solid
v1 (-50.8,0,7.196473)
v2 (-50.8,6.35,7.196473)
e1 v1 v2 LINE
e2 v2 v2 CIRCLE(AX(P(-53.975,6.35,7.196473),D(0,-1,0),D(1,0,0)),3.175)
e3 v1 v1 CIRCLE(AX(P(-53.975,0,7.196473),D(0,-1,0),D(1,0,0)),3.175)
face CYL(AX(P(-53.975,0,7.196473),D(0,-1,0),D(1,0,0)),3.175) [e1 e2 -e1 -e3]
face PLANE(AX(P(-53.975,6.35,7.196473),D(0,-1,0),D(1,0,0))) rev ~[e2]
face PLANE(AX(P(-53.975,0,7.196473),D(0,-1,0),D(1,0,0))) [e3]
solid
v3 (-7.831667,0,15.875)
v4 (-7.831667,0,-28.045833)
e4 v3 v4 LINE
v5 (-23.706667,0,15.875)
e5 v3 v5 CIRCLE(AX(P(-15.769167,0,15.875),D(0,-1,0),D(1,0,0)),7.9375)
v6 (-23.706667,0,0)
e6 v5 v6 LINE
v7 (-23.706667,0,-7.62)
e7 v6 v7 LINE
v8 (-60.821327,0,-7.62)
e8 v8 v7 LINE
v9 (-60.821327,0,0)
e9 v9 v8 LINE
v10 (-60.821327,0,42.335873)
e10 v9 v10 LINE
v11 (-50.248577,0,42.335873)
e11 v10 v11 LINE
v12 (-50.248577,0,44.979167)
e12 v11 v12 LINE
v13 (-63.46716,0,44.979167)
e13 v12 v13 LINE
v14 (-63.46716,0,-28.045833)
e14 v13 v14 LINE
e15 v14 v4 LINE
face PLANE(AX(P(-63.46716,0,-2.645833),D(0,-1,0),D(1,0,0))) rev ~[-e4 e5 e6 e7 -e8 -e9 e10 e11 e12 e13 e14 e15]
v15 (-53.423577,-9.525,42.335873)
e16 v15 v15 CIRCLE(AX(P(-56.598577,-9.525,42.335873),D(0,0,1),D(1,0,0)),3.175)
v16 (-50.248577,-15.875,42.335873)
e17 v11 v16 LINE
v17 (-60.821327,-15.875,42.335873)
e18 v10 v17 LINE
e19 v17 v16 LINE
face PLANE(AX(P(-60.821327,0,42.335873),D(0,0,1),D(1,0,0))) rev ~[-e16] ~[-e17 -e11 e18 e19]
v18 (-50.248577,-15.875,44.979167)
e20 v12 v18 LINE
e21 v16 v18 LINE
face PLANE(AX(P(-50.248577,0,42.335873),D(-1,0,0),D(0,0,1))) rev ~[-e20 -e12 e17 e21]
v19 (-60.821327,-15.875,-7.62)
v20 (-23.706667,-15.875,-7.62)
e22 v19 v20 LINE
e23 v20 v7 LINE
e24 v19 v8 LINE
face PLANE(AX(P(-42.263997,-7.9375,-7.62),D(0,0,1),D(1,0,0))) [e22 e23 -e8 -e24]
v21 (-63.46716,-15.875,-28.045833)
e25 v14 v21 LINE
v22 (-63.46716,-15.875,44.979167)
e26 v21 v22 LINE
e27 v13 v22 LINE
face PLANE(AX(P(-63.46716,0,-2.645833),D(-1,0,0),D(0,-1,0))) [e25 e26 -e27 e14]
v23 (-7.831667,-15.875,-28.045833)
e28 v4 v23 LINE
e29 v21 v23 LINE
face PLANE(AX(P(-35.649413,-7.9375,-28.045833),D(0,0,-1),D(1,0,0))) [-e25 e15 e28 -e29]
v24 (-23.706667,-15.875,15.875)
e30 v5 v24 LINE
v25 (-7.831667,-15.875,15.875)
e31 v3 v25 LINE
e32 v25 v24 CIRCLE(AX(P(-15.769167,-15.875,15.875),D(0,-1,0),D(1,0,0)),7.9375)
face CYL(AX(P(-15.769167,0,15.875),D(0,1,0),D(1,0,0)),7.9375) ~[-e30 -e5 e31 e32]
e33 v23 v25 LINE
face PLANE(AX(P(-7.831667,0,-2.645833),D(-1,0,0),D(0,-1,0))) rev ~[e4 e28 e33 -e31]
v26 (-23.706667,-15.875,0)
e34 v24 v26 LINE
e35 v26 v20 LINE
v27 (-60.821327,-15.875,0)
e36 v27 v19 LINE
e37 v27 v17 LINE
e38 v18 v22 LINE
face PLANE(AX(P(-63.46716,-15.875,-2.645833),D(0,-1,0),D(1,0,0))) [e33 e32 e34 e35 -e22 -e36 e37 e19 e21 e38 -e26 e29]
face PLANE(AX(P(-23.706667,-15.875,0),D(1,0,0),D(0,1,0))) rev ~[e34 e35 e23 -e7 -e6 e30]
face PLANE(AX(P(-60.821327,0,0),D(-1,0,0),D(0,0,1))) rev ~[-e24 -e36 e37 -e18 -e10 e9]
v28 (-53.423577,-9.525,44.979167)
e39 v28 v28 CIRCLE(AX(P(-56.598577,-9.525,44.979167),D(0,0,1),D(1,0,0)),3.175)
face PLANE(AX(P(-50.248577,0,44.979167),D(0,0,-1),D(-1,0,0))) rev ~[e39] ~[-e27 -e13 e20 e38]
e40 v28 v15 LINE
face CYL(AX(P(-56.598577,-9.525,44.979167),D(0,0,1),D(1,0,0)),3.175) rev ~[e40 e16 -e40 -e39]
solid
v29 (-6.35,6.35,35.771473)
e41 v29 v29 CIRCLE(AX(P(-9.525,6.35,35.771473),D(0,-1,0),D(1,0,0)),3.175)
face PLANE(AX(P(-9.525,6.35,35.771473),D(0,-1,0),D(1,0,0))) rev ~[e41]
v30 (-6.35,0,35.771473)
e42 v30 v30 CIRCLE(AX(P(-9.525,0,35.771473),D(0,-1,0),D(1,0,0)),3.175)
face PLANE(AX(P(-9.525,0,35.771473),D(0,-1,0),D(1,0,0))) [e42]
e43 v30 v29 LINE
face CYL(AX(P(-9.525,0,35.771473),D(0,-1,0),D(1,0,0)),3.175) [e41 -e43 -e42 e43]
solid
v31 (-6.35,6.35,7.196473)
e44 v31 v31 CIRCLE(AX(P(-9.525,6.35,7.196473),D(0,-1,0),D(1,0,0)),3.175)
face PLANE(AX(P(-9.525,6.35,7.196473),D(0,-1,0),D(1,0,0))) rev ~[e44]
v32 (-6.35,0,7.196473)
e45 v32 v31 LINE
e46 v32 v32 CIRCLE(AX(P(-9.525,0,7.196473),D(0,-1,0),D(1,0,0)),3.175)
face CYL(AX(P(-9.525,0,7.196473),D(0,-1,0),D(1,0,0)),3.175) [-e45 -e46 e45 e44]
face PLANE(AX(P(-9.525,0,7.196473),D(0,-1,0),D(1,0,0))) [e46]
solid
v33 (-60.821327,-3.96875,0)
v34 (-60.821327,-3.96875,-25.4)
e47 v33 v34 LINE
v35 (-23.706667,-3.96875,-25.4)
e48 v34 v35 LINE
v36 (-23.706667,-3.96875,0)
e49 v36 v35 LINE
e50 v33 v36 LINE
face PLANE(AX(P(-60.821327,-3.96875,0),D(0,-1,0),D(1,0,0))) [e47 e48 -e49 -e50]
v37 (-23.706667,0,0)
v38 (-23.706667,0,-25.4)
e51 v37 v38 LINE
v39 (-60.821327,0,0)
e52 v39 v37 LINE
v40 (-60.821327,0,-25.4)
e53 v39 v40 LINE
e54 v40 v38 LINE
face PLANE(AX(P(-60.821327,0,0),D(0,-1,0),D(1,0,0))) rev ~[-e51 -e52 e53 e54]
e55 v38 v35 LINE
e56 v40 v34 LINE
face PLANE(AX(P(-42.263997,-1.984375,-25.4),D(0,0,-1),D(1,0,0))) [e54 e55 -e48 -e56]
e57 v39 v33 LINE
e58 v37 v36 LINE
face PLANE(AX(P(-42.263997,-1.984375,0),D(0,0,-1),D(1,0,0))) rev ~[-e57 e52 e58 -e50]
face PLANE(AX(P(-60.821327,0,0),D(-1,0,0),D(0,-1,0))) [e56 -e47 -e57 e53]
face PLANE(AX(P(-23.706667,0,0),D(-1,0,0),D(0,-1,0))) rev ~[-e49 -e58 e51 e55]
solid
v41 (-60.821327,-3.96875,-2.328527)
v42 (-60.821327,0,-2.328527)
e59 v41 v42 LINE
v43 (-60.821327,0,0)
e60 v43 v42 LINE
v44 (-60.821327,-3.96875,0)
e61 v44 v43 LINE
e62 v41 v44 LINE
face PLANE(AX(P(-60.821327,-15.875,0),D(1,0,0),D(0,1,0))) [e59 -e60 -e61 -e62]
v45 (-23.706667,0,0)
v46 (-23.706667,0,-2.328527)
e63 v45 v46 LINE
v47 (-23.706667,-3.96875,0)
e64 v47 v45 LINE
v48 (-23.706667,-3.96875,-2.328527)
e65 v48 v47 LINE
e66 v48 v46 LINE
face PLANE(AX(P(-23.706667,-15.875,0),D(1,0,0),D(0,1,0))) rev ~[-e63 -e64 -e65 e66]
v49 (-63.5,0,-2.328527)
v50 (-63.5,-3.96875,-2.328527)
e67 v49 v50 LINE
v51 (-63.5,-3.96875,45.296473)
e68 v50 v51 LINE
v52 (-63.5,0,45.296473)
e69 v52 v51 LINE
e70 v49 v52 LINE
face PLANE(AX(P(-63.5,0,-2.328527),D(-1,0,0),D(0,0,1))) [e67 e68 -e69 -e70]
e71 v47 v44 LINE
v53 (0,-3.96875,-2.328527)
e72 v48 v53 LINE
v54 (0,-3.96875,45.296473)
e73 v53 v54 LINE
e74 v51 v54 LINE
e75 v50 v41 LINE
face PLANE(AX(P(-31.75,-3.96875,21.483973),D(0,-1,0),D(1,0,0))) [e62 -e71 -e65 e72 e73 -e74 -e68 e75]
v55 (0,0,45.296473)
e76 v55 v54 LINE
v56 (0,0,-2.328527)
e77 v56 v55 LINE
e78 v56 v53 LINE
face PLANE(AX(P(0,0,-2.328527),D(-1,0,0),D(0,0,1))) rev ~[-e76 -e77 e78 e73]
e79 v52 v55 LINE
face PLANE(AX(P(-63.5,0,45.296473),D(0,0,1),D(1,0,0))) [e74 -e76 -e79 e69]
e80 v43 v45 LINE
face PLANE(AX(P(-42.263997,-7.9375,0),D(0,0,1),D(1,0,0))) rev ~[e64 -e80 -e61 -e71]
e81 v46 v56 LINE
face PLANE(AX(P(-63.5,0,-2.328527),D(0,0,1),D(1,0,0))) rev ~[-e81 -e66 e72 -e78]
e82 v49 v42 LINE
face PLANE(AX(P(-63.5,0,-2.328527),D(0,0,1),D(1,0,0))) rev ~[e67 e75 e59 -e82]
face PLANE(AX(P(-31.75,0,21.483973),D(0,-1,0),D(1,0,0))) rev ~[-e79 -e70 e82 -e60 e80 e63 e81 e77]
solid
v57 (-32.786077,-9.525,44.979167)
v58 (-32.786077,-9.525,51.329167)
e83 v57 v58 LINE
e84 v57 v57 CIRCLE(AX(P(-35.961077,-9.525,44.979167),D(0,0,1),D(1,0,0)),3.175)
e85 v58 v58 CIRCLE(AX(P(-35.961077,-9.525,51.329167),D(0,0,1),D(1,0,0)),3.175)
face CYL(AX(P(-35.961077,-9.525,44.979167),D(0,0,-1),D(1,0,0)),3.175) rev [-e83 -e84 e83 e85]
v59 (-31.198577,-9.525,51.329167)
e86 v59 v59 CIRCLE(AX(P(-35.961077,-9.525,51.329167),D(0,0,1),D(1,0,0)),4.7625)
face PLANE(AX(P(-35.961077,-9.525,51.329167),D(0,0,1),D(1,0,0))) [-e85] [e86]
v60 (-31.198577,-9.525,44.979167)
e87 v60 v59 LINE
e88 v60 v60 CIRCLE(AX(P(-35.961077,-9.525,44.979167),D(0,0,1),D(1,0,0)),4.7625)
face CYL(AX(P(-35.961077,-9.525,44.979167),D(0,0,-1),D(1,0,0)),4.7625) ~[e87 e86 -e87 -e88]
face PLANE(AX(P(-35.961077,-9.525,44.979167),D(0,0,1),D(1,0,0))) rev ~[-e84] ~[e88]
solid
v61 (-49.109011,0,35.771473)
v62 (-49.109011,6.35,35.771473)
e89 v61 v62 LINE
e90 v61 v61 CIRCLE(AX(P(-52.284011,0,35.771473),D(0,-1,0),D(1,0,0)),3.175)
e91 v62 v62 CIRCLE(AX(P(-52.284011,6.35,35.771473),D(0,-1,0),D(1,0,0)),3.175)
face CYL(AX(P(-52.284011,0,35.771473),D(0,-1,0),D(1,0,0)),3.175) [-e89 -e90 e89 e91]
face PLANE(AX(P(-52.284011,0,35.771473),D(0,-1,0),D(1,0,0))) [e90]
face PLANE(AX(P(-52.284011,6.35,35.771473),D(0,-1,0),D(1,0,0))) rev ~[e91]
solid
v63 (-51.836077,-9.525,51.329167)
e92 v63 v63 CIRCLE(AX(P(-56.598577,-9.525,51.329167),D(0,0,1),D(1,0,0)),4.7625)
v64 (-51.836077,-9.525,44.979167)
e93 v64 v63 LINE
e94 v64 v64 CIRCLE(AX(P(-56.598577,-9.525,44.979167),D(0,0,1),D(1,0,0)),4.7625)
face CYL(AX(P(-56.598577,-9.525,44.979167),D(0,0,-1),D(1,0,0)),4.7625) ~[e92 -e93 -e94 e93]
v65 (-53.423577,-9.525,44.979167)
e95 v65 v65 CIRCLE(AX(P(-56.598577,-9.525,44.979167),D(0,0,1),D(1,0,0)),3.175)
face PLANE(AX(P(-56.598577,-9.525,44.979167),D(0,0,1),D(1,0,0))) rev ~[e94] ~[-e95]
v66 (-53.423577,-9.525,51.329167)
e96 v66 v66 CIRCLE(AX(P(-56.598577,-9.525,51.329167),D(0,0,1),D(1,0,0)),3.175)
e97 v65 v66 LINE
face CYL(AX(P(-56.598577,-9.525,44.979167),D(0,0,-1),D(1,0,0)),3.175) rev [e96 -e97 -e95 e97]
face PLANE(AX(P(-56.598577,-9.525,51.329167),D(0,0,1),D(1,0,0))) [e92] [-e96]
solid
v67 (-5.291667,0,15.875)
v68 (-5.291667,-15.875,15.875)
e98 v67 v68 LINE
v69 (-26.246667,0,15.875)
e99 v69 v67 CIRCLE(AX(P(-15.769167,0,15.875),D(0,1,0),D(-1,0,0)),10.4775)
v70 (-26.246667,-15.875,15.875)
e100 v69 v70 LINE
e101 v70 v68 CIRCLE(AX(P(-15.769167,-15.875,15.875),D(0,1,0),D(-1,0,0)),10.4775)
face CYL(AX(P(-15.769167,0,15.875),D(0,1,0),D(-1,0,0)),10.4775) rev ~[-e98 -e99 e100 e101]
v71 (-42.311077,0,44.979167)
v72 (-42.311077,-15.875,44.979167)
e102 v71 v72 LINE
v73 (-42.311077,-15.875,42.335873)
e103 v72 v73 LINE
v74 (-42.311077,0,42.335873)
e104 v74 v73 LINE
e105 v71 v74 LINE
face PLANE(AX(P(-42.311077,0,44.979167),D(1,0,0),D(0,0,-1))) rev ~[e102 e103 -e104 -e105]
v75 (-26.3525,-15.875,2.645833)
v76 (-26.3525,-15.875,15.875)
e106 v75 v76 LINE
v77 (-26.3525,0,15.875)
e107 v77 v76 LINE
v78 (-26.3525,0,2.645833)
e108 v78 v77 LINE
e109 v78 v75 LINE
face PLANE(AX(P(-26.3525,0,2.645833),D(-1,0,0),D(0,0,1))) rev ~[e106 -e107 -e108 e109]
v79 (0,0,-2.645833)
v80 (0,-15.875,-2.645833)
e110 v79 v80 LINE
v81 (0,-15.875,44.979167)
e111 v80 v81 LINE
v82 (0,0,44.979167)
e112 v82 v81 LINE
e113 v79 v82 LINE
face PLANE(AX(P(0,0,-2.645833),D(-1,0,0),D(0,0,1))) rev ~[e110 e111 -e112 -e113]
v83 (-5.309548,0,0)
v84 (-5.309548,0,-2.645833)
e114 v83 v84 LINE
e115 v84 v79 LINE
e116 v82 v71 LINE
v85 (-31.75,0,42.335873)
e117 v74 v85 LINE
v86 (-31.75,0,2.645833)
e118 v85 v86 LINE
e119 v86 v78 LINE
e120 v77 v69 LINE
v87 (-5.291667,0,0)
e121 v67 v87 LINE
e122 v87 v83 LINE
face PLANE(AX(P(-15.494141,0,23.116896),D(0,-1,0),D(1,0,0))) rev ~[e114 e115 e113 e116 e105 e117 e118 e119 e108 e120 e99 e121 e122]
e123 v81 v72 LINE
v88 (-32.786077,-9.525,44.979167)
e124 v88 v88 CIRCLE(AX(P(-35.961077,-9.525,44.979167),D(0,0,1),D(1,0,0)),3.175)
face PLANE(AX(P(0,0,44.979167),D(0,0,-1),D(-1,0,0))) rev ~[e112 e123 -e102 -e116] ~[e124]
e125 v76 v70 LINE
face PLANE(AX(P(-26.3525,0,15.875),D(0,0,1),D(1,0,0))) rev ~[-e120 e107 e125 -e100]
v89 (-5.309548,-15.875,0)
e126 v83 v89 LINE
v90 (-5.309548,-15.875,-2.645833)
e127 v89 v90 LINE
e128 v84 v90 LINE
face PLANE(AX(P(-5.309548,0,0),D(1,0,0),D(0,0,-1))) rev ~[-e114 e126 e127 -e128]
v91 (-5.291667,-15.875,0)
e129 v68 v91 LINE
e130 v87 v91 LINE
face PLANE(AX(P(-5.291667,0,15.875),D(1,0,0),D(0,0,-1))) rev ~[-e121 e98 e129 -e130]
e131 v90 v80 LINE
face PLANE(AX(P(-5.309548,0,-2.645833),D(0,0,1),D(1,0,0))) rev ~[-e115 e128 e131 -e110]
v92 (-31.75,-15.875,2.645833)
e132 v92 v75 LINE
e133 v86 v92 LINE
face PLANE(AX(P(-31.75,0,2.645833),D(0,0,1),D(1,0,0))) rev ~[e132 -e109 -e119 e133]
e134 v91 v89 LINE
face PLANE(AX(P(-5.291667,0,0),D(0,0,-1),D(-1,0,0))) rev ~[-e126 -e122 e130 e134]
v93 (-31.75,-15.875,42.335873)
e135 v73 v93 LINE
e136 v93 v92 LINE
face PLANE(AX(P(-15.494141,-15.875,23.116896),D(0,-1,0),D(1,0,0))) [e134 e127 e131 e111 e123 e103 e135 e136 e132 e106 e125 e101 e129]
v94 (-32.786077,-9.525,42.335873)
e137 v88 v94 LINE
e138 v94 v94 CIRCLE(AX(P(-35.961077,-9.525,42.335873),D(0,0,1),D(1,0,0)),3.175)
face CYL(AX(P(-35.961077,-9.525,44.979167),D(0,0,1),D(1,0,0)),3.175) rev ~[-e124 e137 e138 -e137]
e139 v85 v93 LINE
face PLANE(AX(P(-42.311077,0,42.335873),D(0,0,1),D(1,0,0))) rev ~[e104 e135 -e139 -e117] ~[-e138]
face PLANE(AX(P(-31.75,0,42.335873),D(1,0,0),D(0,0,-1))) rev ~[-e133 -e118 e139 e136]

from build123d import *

# Parameters (mm, degrees)
F1_DEPTH  = 15.875
F0_W      = 2.6458333332
F0_H      = 42.3358732487
F2_W      = 63.5
F2_H      = 47.625
F2_R      = 3.175
F3_DEPTH  = 3.96875
F4_DEPTH  = 6.35
F5_R      = 4.7625
F5_R_2    = 3.175
F6_DEPTH  = 6.35
F7_R      = 3.175
F8_DEPTH  = 25.4
F9_W      = 55.6354932006
F9_H      = 15.875
F10_DEPTH = 25.4
F11_W     = 37.1146598675
F11_H     = 15.875
F12_DEPTH = 7.62
F13_W     = 37.1146598675
F13_H     = 3.96875
F14_DEPTH = 25.4


# Not quite as in the source:
# - a feature names something its author has since deleted; it is built from what else it names


with BuildPart() as f1:
    # F0 (on Front) → F1 (new body)
    with BuildSketch(Plane.XZ):
        with BuildLine():
            Line((0, 44.979166582), (-31.75, 44.979166582))
            Line((-31.75, 44.979166582), (-31.75, 42.3358732487))
            Line((-31.75, 42.3358732487), (-31.75, 2.6458333332))
            Line((-31.75, 2.6458333332), (-26.3525, 2.6458333332))
            Line((-26.3525, 2.6458333332), (-26.3525, 15.875))
            Line((-26.3525, 15.875), (-26.2466666667, 15.875))
            ThreePointArc((-26.2466666667, 15.875), (-15.7691666667, 26.3525), (-5.2916666667, 15.875))
            Line((-5.2916666667, 15.875), (-5.2916666667, 0))
            Line((-5.2916666667, 0), (0, 0))
            Line((0, 0), (0, 44.979166582))
        make_face()
        Polygon((0, -2.6458333333), (0, 0), (-5.2916666667, 0), (-5.309548229, 0), (-5.309548229, -2.6458333333), align=None)
        Polygon((-31.75, 42.3358732487), (-31.75, 44.979166582), (-34.3958333316, 44.979166582), (-37.0416664956, 44.979166582), (-42.3110765377, 44.979166582), (-42.3110765377, 42.3358732487), (-37.0416664956, 42.3358732487), (-34.3958333316, 42.3358732487), align=None)
    extrude(amount=F1_DEPTH)


with BuildPart() as f1b:
    # F0 (on Front) → F1, piece 2 (new body)
    with BuildSketch(Plane.XZ):
        with BuildLine():
            Line((-23.7066666667, 0), (-7.8316666667, 0))
            Line((-7.8316666667, 0), (-7.8316666667, 15.875))
            ThreePointArc((-7.8316666667, 15.875), (-15.7691666667, 23.8125), (-23.7066666667, 15.875))
            Line((-23.7066666667, 15.875), (-23.7066666667, 0))
        make_face()
        Polygon((-26.3525, 0), (-31.75, 0), (-60.8213265341, 0), (-63.4671598673, 0), (-63.4671598673, -2.6458333333), (-7.8316666667, -2.6458333333), (-7.8316666667, 0), (-23.7066666667, 0), align=None)
        with Locations((-62.1442432007, 21.1679366243)):
            Rectangle(F0_W, F0_H)
        Polygon((-50.2485765377, 42.3358732487), (-50.2485765377, 44.979166582), (-55.5296598693, 44.979166582), (-58.175493201, 44.979166582), (-63.4671598673, 44.979166582), (-63.4671598673, 42.3358732487), (-60.8213265341, 42.3358732487), (-58.175493201, 42.3358732487), (-55.5296598693, 42.3358732487), align=None)
    extrude(amount=F1_DEPTH)


with BuildPart() as f3:
    # F2 (on Front) → F3 (new body)
    with BuildSketch(Plane.XZ):
        with Locations((-31.75, 21.4839725468)):
            Rectangle(F2_W, F2_H)
        with Locations((-53.975, 7.1964725468)):
            Circle(F2_R, mode=Mode.SUBTRACT)
        with Locations((-9.525, 7.1964725468)):
            Circle(F2_R, mode=Mode.SUBTRACT)
        with Locations((-52.284011212, 35.7714725468)):
            Circle(F2_R, mode=Mode.SUBTRACT)
        with Locations((-9.525, 35.7714725468)):
            Circle(F2_R, mode=Mode.SUBTRACT)
        with Locations((-52.284011212, 35.7714725468)):
            Circle(F2_R)
        with Locations((-53.975, 7.1964725468)):
            Circle(F2_R)
        with Locations((-9.525, 7.1964725468)):
            Circle(F2_R)
        with Locations((-9.525, 35.7714725468)):
            Circle(F2_R)
    extrude(amount=F3_DEPTH)


with BuildPart() as f4:
    # F2 (on Front) → F4 (new body)
    with BuildSketch(Plane.XZ):
        with Locations((-9.525, 35.7714725468)):
            Circle(F2_R)
    extrude(amount=-F4_DEPTH)


with BuildPart() as f4b:
    # F2 (on Front) → F4, piece 2 (new body)
    with BuildSketch(Plane.XZ):
        with Locations((-52.284011212, 35.7714725468)):
            Circle(F2_R)
    extrude(amount=-F4_DEPTH)


with BuildPart() as f4c:
    # F2 (on Front) → F4, piece 3 (new body)
    with BuildSketch(Plane.XZ):
        with Locations((-9.525, 7.1964725468)):
            Circle(F2_R)
    extrude(amount=-F4_DEPTH)


with BuildPart() as f4d:
    # F2 (on Front) → F4, piece 4 (new body)
    with BuildSketch(Plane.XZ):
        with Locations((-53.975, 7.1964725468)):
            Circle(F2_R)
    extrude(amount=-F4_DEPTH)


with BuildPart() as f6:
    # F5 (on face) → F6 (new body)
    with BuildSketch(Plane.XY.offset(44.979166582)):
        with Locations((-56.5985765377, -9.525)):
            Circle(F5_R)
        with Locations((-56.5985765377, -9.525)):
            Circle(F5_R_2, mode=Mode.SUBTRACT)
    extrude(amount=F6_DEPTH)


with BuildPart() as f6b:
    # F5 (on face) → F6, piece 2 (new body)
    with BuildSketch(Plane.XY.offset(44.979166582)):
        with Locations((-35.9610765377, -9.525)):
            Circle(F5_R)
        with Locations((-35.9610765377, -9.525)):
            Circle(F5_R_2, mode=Mode.SUBTRACT)
    extrude(amount=F6_DEPTH)


with BuildPart() as f8_tool:
    # F7 (on face) → F8 (new body)
    with BuildSketch(Plane.XY.offset(44.979166582)):
        with Locations((-35.9610765377, -9.525)):
            Circle(F7_R)
        with Locations((-56.5985765377, -9.525)):
            Circle(F7_R)
    extrude(amount=-F8_DEPTH)


with BuildPart() as f1_1:
    add(f1.part)

    # F8: cut by f8_tool
    add(f8_tool.part, mode=Mode.SUBTRACT)


with BuildPart() as f1b_1:
    add(f1b.part)

    # F8: cut by f8_tool
    add(f8_tool.part, mode=Mode.SUBTRACT)

    # F9 (on face) → F10 (join)
    with BuildSketch(Plane(origin=(0, 0, -2.6458333333), x_dir=(1, 0, 0), z_dir=(0, 0, -1))):
        with Locations((-35.649413267, 7.9375)):
            Rectangle(F9_W, F9_H)
    extrude(amount=F10_DEPTH)


with BuildPart() as f12_tool:
    # F11 (on face) → F12 (new body)
    with BuildSketch(Plane.XY):
        with Locations((-42.2639966004, -7.9375)):
            Rectangle(F11_W, F11_H)
    extrude(amount=-F12_DEPTH)


with BuildPart() as f1b_2:
    add(f1b_1.part)

    # F12: cut by f12_tool
    add(f12_tool.part, mode=Mode.SUBTRACT)


with BuildPart() as f3_1:
    add(f3.part)

    # F12: cut by f12_tool
    add(f12_tool.part, mode=Mode.SUBTRACT)


with BuildPart() as f14:
    # F13 (on face) → F14 (new body)
    with BuildSketch(Plane(origin=(0, 0, 0), x_dir=(1, 0, 0), z_dir=(0, 0, -1))):
        with Locations((-42.2639966004, 1.984375)):
            Rectangle(F13_W, F13_H)
    extrude(amount=F14_DEPTH)


solid = Compound([f4.part, f4b.part, f4c.part, f4d.part, f6.part, f6b.part, f1_1.part, f1b_2.part, f3_1.part, f14.part])
